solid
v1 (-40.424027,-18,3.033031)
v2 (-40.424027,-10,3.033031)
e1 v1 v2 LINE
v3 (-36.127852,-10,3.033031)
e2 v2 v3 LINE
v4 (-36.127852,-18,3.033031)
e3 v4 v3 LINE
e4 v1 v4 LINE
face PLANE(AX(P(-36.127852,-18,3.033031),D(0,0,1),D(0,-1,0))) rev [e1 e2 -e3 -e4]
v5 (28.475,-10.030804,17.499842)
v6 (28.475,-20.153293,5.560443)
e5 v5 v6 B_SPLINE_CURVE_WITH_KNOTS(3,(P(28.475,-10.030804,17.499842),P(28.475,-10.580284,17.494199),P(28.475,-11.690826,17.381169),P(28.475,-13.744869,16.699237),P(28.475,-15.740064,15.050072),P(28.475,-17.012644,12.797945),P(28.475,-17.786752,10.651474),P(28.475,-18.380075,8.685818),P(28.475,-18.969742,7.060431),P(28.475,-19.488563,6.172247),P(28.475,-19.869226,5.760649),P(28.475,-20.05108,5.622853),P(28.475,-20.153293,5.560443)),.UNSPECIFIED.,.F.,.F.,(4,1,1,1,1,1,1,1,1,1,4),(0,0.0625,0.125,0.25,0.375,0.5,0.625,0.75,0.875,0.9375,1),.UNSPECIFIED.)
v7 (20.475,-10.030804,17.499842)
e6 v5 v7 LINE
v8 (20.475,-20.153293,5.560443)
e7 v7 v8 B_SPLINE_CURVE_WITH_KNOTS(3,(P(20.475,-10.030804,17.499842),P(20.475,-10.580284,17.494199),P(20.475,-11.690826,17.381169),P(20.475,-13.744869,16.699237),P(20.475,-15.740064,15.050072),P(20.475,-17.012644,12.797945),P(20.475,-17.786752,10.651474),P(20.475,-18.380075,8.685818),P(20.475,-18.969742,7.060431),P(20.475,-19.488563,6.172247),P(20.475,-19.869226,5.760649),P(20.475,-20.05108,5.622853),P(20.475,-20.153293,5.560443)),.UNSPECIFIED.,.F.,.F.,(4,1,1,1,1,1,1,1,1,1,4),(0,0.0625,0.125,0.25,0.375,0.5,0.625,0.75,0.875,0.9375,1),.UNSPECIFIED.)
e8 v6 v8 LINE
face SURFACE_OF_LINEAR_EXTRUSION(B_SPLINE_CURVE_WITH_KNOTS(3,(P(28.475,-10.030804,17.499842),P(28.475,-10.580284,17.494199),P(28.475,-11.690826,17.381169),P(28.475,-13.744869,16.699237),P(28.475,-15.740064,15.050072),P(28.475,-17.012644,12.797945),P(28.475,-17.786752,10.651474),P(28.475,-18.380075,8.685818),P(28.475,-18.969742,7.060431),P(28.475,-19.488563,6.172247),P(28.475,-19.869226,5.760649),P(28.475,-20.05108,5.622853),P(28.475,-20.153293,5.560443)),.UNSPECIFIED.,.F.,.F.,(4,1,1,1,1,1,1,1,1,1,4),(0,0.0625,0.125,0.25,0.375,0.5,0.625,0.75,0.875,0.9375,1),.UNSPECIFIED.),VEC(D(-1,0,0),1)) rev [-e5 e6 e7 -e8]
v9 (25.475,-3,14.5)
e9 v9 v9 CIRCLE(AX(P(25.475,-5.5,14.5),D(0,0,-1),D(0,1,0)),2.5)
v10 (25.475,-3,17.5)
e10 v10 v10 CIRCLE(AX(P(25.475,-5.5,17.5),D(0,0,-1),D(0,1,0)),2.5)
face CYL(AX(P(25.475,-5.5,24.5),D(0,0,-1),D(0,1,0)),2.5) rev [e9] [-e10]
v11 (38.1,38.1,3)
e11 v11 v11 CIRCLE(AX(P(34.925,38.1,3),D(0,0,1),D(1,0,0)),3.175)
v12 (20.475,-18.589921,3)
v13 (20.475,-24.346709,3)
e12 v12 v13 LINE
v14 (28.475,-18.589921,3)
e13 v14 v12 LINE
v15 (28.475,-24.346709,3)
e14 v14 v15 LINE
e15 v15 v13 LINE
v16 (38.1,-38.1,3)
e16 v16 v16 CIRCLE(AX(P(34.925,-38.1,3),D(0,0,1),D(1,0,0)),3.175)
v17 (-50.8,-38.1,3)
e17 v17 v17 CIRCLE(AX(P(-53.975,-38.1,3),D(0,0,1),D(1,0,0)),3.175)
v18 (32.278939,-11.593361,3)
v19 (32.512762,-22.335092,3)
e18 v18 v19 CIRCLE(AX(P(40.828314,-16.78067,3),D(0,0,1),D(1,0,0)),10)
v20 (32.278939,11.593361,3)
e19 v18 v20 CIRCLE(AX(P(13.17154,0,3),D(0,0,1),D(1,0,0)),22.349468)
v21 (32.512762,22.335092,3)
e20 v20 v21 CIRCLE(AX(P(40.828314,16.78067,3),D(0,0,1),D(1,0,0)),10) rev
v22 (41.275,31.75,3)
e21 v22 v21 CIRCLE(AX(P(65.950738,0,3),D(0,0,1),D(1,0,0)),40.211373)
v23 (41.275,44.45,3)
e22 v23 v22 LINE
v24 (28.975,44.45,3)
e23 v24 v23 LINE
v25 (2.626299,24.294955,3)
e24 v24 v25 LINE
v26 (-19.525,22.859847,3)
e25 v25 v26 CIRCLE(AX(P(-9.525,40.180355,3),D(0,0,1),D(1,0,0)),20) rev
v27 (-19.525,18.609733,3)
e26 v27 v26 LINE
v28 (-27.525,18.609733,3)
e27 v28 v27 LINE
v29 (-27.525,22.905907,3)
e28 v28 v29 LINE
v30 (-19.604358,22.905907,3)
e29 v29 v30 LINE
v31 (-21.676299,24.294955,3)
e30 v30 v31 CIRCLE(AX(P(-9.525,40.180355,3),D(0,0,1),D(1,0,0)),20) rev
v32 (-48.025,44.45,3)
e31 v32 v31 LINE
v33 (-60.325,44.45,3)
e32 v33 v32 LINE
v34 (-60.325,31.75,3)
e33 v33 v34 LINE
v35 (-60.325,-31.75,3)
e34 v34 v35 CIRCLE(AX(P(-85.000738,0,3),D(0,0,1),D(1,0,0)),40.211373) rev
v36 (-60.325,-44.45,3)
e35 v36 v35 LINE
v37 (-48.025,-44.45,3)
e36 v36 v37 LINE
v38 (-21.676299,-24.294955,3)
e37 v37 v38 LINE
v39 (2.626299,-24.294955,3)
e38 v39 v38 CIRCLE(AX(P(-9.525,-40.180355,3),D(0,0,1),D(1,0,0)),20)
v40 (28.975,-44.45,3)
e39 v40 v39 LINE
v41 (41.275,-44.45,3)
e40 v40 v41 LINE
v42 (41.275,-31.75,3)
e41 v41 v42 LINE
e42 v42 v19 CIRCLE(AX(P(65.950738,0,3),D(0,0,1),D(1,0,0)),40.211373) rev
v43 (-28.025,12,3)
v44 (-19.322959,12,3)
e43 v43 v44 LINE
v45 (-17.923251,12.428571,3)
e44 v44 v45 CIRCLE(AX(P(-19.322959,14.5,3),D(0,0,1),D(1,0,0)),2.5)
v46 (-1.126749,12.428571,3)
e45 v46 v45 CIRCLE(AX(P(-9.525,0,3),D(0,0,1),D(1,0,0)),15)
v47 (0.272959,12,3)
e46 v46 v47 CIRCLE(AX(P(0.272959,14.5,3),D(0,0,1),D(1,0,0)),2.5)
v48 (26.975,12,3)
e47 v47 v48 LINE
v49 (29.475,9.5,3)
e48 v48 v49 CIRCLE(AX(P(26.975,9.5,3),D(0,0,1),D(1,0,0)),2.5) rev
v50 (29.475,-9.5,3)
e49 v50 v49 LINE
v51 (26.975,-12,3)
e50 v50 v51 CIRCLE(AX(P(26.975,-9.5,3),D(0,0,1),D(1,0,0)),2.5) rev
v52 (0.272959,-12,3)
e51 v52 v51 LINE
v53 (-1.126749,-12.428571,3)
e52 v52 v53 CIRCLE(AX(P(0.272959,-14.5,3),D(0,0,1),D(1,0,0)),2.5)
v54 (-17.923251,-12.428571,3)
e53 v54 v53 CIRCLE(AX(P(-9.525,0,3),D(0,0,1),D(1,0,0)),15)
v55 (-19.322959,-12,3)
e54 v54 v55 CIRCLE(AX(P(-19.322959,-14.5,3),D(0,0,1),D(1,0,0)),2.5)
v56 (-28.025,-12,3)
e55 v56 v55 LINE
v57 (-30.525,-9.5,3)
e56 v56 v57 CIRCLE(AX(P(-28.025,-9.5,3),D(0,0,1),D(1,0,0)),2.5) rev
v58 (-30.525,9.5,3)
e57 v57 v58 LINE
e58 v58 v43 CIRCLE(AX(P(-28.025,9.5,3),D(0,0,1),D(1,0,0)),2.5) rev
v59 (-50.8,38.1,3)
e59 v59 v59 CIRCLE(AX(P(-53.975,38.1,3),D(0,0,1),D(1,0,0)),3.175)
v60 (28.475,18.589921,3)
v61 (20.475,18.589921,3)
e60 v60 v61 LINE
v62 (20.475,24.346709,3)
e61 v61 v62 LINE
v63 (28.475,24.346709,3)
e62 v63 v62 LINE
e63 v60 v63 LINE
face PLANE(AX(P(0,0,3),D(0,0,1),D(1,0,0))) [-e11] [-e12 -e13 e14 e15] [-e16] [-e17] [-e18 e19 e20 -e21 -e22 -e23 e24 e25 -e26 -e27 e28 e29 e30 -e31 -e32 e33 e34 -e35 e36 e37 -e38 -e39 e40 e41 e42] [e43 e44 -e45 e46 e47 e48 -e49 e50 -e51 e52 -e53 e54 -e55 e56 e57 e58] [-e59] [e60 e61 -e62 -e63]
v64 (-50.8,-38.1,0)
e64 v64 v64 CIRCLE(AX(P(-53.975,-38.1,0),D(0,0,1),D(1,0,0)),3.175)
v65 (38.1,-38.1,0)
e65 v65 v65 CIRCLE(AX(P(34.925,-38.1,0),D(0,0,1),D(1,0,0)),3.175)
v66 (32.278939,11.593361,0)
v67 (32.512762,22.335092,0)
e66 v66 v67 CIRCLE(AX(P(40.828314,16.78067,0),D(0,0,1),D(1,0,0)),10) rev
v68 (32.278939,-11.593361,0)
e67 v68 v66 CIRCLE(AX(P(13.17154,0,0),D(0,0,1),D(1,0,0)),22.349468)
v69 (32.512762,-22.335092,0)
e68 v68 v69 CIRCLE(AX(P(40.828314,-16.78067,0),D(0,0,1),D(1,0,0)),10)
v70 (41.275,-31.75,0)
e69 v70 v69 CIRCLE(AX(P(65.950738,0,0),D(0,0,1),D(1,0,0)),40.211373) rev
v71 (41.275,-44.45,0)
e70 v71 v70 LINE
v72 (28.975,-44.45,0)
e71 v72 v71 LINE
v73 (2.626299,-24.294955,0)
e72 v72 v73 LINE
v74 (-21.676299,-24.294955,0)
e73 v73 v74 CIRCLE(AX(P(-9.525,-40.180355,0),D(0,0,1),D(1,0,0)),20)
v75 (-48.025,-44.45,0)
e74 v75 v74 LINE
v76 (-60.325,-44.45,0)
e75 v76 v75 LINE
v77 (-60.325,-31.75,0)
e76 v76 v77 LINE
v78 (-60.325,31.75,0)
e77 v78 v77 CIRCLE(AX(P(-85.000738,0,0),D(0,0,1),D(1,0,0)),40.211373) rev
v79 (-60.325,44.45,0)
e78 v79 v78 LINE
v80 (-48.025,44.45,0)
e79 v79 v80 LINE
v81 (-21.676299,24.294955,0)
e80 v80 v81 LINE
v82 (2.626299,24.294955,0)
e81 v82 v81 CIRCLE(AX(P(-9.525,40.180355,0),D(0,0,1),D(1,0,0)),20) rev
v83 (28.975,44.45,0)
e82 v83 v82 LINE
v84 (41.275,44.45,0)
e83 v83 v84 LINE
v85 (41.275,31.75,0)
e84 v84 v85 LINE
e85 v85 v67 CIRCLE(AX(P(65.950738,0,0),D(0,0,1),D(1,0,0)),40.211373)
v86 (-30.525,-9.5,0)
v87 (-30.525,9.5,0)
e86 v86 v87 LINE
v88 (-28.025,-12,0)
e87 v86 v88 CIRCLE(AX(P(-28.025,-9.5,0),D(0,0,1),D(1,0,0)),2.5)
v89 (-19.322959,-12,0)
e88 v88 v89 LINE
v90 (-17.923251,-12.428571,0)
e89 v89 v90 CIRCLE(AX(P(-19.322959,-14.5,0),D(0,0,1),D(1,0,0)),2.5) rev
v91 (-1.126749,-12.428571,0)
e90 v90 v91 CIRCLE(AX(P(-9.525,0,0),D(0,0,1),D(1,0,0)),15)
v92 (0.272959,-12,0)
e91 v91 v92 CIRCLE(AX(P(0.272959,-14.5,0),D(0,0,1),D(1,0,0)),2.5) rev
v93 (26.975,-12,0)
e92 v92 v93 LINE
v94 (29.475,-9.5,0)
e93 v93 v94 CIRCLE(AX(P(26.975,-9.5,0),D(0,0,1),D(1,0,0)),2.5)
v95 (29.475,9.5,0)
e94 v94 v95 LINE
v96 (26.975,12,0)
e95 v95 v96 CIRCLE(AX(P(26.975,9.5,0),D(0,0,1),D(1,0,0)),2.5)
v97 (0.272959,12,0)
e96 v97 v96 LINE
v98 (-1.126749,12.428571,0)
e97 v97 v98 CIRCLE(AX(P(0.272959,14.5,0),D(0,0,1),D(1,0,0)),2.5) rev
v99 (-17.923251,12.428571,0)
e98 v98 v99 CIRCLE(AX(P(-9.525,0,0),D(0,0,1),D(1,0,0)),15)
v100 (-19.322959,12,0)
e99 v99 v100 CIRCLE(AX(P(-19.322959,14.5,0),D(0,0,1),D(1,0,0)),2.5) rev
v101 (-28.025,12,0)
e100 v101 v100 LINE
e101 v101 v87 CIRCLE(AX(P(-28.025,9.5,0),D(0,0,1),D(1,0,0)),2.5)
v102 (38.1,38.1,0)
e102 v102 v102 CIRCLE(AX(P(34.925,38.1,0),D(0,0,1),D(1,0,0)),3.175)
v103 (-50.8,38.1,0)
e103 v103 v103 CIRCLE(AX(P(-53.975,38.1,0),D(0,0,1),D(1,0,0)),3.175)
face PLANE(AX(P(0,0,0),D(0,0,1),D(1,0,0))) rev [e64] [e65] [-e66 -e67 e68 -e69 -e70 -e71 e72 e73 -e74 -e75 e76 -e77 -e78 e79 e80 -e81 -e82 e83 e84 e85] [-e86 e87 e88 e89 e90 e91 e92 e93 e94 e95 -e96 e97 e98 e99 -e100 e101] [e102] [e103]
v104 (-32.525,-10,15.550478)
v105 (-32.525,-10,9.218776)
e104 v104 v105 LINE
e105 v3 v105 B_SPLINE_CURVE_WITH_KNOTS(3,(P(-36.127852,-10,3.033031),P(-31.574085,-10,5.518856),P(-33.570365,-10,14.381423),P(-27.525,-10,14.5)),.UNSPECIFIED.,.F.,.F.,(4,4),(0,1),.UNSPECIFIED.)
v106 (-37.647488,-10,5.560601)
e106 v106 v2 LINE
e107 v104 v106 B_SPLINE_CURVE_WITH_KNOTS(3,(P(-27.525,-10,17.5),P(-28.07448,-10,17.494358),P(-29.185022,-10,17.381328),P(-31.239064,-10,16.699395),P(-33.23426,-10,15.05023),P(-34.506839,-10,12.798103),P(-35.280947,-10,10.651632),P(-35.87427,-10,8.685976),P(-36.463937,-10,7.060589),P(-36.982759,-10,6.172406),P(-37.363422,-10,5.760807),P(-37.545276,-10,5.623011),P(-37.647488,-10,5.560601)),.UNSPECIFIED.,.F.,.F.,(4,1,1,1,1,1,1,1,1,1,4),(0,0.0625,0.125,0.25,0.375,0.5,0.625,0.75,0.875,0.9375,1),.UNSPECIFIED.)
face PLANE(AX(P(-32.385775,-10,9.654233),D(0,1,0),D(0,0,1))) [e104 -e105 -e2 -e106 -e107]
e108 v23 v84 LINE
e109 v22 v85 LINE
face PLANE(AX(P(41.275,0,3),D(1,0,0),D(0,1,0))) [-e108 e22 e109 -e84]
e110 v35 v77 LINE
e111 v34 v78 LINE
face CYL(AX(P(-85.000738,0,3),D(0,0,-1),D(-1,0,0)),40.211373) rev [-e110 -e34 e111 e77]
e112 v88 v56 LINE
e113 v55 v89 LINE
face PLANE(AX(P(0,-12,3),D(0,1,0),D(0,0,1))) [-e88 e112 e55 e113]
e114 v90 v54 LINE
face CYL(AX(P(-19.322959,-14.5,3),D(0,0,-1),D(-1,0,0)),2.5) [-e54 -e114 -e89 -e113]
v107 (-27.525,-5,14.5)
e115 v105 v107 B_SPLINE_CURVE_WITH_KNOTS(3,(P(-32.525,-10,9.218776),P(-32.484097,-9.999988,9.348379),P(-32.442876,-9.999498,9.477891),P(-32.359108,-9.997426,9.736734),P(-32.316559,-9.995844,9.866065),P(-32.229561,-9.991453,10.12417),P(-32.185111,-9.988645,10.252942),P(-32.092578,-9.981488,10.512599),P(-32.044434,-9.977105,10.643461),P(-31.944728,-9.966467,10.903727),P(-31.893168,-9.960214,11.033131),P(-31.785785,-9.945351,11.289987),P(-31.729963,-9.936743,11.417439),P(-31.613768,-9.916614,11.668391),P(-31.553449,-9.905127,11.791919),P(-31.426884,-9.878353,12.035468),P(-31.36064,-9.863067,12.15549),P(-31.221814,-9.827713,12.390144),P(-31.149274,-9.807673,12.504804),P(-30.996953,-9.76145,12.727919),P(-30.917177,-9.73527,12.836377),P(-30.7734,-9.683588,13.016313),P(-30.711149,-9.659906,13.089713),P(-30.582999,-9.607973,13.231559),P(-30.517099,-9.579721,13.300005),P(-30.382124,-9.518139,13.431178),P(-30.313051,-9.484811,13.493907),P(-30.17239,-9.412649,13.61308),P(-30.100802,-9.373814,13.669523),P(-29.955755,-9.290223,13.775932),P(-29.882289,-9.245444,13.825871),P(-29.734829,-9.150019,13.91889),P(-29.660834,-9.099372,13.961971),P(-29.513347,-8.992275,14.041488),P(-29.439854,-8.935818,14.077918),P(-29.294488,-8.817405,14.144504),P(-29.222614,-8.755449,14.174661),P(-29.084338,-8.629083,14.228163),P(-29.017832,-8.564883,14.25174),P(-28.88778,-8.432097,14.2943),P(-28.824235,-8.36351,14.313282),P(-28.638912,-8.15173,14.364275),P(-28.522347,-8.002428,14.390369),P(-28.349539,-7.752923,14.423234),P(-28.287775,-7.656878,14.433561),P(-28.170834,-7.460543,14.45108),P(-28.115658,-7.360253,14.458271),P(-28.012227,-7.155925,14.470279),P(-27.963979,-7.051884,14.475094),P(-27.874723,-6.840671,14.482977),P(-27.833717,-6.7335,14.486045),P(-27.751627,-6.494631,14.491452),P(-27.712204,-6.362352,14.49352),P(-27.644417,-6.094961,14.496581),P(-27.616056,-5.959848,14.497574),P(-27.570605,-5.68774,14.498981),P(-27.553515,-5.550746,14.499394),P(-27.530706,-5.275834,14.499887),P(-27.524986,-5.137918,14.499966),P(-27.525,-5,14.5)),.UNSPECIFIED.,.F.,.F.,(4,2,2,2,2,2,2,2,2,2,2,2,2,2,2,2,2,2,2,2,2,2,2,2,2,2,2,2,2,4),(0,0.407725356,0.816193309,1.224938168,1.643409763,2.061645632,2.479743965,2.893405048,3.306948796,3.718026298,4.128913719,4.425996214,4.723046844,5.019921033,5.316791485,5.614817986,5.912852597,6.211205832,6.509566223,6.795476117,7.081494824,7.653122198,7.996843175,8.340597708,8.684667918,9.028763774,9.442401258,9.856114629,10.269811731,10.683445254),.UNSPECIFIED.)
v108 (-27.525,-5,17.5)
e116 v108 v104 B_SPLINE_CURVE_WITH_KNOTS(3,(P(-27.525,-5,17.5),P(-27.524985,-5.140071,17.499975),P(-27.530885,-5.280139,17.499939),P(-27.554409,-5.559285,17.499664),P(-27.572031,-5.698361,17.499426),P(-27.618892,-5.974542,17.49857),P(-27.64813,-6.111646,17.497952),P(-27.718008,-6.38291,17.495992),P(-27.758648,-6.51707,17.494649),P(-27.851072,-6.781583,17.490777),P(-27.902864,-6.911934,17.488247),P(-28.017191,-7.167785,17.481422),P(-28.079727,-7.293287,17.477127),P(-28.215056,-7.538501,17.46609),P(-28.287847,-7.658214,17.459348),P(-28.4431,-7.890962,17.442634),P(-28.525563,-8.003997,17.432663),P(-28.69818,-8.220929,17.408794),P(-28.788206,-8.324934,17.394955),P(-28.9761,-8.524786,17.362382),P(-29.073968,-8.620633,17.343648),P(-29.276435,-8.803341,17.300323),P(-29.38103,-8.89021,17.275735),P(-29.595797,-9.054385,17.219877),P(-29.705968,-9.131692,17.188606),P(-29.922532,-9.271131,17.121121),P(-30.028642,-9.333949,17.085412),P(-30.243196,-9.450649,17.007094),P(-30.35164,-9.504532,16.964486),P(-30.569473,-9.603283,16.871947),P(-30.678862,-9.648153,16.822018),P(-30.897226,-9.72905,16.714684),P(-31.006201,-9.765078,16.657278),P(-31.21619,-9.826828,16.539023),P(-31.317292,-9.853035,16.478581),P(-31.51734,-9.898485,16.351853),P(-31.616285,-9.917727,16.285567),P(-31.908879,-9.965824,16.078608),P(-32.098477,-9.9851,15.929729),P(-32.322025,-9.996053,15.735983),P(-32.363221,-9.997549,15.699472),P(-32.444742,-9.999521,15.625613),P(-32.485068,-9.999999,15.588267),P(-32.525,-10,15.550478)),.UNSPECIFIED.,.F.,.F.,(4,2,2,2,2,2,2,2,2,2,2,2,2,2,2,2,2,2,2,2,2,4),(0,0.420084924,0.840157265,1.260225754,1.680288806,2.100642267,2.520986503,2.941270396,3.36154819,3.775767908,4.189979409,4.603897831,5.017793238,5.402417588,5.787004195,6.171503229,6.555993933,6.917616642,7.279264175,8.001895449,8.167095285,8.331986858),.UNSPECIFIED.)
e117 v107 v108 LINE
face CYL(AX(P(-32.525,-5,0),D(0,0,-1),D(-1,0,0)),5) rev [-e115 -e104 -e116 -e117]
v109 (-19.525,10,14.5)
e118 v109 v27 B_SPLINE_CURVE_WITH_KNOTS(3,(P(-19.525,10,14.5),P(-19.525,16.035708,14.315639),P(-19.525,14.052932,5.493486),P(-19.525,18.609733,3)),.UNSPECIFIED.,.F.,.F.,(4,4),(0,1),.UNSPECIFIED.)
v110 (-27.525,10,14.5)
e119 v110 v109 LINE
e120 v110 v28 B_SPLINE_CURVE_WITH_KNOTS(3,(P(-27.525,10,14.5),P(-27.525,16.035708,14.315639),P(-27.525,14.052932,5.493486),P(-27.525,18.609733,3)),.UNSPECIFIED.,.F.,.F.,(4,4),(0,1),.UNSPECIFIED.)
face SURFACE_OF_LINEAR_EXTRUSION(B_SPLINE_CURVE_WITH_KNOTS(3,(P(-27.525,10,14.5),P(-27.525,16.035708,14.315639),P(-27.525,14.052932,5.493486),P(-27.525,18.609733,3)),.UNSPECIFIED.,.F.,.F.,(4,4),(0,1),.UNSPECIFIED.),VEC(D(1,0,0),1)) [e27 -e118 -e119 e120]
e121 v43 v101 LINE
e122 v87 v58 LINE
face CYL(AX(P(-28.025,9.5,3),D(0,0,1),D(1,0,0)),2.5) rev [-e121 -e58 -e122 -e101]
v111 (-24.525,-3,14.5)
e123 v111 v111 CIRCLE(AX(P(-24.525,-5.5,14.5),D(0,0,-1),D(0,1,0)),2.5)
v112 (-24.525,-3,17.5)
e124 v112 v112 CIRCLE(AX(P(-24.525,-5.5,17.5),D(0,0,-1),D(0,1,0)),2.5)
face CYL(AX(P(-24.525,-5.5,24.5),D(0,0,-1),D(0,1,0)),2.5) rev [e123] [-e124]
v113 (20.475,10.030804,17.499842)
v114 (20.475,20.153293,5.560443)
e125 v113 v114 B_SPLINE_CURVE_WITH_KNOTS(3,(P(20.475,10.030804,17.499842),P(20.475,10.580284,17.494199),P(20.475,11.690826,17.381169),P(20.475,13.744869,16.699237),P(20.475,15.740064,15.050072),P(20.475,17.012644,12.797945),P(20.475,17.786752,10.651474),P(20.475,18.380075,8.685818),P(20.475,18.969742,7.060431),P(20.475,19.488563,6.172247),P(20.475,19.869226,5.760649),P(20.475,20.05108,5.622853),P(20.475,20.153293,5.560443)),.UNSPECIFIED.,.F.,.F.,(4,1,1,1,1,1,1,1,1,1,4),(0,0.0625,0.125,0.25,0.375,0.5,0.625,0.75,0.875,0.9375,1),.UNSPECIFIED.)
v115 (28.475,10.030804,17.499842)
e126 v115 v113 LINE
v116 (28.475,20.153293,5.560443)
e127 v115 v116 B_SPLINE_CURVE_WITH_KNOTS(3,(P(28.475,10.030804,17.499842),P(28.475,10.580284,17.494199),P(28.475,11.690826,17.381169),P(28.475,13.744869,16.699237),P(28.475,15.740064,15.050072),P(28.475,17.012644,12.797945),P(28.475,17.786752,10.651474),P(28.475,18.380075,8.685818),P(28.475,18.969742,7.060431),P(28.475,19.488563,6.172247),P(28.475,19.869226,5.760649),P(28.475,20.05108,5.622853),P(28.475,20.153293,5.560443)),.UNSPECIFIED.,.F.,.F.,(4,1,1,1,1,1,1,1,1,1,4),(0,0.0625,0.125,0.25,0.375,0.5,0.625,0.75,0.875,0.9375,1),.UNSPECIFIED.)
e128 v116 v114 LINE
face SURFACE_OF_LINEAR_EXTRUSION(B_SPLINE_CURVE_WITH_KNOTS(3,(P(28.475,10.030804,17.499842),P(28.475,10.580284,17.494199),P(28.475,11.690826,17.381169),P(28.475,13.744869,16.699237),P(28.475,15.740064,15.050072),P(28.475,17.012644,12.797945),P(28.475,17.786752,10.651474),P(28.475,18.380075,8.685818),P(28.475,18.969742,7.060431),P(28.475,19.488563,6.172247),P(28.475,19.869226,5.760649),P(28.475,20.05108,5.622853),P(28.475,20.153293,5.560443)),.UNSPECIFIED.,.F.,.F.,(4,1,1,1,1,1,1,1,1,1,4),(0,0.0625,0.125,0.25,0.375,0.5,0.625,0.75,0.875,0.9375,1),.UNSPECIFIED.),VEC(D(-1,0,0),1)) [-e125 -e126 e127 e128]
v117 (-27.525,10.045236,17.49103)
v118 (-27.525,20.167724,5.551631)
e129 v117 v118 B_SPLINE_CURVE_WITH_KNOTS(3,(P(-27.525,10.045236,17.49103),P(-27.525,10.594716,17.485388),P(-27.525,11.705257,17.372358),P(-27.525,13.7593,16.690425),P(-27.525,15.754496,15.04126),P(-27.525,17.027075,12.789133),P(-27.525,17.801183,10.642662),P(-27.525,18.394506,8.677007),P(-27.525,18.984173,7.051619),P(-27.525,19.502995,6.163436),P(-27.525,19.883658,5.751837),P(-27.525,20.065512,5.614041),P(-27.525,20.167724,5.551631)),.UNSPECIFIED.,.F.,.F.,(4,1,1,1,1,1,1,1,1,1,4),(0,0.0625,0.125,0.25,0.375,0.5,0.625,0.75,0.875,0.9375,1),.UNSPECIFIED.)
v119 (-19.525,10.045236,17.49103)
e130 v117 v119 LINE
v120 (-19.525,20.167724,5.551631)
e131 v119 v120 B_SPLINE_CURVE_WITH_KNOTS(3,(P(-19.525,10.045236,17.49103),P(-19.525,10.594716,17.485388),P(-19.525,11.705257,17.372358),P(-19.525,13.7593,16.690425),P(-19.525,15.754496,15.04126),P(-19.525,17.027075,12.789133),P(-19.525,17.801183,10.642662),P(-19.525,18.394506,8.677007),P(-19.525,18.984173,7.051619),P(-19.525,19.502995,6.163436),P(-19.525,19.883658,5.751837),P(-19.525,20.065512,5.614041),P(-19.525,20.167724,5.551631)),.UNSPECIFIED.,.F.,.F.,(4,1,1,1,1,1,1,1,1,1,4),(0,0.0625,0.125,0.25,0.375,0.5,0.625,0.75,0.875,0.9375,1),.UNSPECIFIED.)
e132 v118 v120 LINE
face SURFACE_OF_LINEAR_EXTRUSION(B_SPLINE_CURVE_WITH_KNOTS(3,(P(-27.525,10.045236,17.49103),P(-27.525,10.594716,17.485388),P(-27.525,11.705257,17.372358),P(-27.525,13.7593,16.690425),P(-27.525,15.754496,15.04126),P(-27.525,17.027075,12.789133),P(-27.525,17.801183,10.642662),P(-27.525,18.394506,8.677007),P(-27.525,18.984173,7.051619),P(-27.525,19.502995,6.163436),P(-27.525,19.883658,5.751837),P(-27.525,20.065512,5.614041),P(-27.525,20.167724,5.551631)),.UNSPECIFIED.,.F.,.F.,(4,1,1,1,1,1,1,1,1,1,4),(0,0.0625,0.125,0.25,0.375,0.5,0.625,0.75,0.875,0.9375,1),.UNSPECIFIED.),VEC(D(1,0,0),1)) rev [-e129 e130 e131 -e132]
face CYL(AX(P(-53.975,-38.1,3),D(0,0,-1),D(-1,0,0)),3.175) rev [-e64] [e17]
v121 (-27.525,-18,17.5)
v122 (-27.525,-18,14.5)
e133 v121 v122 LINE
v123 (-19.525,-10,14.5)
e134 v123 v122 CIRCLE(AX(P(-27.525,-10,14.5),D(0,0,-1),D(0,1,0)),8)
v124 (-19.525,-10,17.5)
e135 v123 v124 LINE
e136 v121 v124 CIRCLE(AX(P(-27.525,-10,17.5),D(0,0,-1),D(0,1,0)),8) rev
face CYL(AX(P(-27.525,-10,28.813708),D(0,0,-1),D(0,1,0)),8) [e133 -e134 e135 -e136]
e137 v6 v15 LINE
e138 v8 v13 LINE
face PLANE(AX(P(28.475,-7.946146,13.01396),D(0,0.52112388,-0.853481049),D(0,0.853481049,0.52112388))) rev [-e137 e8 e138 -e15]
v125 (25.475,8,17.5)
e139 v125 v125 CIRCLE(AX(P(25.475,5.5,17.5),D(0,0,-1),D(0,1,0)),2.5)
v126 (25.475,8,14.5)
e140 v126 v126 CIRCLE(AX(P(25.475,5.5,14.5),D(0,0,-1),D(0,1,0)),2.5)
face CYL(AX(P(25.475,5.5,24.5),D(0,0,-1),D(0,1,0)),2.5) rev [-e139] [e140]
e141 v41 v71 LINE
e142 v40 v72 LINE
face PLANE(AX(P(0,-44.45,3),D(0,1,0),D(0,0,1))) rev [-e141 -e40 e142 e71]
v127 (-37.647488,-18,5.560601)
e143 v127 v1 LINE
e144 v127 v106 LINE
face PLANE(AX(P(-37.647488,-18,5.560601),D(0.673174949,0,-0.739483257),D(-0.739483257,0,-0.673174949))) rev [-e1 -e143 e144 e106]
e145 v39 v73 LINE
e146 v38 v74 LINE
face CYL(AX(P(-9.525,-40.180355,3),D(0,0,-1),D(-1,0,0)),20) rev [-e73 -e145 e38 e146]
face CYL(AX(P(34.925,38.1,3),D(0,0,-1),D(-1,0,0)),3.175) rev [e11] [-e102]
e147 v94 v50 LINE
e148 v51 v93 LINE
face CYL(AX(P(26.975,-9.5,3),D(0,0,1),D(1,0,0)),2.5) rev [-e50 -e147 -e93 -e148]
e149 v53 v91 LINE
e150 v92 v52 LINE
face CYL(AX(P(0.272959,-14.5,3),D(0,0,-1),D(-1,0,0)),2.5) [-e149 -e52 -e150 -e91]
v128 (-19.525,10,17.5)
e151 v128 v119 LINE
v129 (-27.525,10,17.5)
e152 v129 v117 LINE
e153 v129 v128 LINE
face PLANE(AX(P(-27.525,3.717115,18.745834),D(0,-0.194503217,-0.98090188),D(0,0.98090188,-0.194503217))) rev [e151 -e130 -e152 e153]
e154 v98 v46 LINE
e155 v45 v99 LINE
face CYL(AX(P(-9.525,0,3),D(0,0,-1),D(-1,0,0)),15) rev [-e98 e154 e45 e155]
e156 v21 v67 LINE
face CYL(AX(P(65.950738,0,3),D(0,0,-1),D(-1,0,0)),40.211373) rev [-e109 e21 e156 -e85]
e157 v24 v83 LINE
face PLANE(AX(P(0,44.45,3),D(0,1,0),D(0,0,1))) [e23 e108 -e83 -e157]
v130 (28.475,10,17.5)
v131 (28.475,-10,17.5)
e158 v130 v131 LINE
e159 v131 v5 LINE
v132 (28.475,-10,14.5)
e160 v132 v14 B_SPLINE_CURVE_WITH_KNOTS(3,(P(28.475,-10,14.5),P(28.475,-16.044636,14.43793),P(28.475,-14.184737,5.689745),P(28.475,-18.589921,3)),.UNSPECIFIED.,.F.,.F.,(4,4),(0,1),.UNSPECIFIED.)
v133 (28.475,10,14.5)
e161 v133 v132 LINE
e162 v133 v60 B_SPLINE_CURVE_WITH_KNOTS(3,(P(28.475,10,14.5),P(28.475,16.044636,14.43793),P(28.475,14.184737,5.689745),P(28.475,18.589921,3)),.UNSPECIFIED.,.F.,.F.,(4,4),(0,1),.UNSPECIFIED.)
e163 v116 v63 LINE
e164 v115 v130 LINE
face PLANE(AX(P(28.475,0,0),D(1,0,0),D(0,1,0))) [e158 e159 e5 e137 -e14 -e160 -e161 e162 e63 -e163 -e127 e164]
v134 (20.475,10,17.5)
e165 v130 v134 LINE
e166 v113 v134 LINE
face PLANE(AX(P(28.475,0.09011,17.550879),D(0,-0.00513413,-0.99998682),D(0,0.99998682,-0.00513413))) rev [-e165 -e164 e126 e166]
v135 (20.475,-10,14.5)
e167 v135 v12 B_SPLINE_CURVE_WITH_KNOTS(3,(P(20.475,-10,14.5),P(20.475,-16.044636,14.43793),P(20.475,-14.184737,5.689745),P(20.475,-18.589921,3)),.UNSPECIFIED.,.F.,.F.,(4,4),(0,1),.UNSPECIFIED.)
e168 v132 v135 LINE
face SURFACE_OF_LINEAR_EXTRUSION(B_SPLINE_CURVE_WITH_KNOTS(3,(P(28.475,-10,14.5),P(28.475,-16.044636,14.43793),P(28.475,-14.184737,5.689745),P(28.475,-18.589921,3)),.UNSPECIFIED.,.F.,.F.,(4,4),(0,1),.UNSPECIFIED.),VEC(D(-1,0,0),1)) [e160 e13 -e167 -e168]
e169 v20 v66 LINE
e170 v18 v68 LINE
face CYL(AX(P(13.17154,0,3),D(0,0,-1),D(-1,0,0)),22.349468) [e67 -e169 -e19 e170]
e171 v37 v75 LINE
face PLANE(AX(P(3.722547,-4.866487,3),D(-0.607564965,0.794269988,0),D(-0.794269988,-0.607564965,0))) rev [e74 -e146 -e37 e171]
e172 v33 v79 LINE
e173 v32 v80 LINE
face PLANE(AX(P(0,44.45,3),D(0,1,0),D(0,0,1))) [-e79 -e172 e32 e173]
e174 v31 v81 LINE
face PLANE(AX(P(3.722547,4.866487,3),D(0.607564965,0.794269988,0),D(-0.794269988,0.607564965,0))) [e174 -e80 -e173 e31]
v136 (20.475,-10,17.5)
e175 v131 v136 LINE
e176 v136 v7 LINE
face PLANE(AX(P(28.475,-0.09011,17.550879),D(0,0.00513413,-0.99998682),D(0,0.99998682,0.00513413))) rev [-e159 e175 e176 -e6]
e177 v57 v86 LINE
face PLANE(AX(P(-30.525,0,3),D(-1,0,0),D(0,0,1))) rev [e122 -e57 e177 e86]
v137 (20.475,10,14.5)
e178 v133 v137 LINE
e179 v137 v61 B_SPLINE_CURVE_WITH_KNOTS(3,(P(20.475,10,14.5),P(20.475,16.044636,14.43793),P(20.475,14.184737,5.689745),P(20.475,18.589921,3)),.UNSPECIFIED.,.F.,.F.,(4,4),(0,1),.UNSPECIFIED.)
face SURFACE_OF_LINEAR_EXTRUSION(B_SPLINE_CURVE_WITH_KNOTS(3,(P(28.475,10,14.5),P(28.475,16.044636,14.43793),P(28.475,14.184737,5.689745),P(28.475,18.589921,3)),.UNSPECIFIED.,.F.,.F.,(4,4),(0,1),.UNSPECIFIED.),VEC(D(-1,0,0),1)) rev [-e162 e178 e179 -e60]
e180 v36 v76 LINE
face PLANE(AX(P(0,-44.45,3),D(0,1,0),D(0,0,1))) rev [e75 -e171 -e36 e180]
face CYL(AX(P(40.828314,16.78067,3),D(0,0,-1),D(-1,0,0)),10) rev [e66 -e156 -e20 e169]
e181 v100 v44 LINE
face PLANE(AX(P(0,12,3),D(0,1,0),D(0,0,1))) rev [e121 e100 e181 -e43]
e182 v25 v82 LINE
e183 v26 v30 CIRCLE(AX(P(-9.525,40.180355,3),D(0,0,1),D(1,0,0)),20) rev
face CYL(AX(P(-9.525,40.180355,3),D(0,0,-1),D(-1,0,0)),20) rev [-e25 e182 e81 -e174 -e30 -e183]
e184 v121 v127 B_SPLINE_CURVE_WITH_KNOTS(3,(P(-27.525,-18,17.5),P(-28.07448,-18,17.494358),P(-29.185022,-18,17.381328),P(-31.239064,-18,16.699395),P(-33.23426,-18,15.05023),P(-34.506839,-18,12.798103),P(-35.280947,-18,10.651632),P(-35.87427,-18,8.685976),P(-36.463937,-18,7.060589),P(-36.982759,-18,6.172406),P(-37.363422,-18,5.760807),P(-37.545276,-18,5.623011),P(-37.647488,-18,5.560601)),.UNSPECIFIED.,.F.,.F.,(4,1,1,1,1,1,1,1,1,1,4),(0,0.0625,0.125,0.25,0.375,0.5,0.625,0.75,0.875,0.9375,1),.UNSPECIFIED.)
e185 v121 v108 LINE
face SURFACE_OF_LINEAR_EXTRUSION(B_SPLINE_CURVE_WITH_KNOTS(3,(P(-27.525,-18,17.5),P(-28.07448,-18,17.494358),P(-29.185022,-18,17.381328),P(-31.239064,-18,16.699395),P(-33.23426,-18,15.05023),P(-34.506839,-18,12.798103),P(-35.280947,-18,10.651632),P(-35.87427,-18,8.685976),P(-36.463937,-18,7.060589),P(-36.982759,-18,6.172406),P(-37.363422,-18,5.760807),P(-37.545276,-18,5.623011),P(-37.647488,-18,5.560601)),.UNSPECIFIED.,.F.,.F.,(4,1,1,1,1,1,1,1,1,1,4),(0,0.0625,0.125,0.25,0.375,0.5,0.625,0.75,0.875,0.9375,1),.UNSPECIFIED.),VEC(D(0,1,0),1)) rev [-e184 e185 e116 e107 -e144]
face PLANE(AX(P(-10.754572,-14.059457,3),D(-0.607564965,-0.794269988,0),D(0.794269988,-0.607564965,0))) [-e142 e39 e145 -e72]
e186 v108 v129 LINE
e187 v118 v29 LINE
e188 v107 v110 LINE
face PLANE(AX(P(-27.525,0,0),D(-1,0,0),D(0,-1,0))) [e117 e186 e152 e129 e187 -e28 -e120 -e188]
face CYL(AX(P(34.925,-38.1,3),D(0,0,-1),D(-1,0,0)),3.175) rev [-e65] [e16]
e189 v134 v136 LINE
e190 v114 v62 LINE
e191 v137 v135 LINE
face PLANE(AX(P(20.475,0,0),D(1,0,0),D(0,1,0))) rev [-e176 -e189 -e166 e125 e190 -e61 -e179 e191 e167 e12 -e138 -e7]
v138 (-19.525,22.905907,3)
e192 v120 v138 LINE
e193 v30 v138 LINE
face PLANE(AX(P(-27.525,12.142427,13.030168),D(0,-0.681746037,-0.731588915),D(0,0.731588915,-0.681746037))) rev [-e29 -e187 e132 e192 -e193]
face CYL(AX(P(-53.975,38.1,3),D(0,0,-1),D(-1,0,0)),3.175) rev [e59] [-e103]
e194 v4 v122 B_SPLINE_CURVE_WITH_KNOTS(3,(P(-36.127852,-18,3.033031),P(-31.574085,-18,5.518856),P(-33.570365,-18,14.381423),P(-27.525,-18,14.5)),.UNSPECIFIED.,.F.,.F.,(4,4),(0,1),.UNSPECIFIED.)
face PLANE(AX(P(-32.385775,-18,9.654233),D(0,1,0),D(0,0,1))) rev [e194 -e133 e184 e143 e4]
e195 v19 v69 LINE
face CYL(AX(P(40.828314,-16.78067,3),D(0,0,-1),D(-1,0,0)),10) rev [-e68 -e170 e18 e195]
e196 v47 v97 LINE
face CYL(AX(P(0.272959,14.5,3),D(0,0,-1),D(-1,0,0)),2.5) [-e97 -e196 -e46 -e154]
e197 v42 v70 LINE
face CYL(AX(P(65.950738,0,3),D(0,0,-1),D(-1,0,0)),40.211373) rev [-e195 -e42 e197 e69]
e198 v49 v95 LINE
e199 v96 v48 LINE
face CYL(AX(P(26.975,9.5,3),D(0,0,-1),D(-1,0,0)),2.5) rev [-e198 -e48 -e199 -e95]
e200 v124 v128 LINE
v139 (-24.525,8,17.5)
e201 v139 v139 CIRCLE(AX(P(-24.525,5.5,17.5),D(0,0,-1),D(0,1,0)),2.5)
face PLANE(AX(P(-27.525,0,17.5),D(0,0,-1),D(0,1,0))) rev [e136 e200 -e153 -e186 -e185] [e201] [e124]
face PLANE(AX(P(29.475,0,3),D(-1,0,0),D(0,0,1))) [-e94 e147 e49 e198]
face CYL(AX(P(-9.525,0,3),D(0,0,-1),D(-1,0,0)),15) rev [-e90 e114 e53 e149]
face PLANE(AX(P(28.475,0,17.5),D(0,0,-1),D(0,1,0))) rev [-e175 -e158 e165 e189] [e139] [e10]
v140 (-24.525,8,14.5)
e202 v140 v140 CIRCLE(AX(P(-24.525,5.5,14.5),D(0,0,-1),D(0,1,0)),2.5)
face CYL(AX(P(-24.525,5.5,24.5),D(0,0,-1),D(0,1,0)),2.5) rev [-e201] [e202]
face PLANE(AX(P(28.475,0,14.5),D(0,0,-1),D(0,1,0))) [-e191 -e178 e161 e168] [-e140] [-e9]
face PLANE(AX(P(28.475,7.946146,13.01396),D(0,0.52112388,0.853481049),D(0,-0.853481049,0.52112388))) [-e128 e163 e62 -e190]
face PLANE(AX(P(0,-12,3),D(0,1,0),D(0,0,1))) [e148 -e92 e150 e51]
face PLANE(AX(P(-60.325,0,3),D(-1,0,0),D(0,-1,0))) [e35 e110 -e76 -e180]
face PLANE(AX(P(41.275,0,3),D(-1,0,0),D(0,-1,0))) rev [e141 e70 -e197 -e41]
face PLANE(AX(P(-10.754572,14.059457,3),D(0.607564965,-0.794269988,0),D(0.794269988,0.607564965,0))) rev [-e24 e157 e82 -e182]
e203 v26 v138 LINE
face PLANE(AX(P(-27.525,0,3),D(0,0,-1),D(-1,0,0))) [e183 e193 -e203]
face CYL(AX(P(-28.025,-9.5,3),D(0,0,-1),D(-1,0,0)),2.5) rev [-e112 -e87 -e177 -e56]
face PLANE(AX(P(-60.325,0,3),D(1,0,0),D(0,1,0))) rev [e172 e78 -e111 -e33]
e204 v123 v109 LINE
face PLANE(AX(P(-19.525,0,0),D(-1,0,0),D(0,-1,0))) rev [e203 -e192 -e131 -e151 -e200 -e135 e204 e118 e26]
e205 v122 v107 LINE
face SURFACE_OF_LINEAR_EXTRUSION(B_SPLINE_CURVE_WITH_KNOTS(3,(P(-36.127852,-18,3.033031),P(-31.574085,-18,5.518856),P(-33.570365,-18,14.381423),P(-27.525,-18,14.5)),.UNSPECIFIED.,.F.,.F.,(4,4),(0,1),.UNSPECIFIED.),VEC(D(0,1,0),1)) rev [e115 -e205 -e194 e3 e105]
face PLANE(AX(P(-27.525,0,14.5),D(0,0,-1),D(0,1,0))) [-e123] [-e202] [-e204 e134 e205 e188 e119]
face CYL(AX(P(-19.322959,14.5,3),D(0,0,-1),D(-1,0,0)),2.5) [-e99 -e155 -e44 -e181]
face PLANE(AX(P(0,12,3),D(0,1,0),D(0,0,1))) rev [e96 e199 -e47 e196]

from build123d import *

# Parameters (mm, degrees)
SKETCH1_R           = 3.175
BOSS_EXTRUDE1_DEPTH = 3
SKETCH2_W           = 20
SKETCH2_H           = 3
BOSS_EXTRUDE2_DEPTH = 8
SKETCH3_W           = 3
SKETCH3_H           = 10
BOSS_EXTRUDE3_DEPTH = 8
BOSS_EXTRUDE4_DEPTH = 3
BOSS_EXTRUDE5_DEPTH = 8
FILLET1_START       = 9.218775709
FILLET1_DEPTH       = 8.281224391
FILLET1_START_2     = -10
FILLET1_2_DEPTH     = 6
FILLET2_R           = 2.5
SKETCH6_R           = 2.5
CUT_EXTRUDE1_DEPTH  = 10


with BuildPart() as part:
    # Sketch1 → Boss-Extrude1 (new body)
    with BuildSketch(Plane.XY):
        with BuildLine():
            Line((-60.325, -31.75), (-60.325, -44.45))
            Line((-60.325, -44.45), (-48.025, -44.45))
            Line((-48.025, -44.45), (-21.676299295, -24.294954915))
            ThreePointArc((-21.676299295, -24.294954915), (-9.525, -20.180354672), (2.626299295, -24.294954915))
            Line((2.626299295, -24.294954915), (28.975, -44.45))
            Line((28.975, -44.45), (41.275, -44.45))
            Line((41.275, -44.45), (41.275, -31.75))
            ThreePointArc((41.275, -31.75), (36.515027492, -27.39513634), (32.512762317, -22.33509195))
            ThreePointArc((32.512762317, -22.33509195), (30.830682399, -16.998296592), (32.278938689, -11.593360767))
            ThreePointArc((32.278938689, -11.593360767), (35.521007508, 0), (32.278938689, 11.593360767))
            ThreePointArc((32.278938689, 11.593360767), (30.830682399, 16.998296592), (32.512762317, 22.33509195))
            ThreePointArc((32.512762317, 22.33509195), (36.515027492, 27.39513634), (41.275, 31.75))
            Line((41.275, 31.75), (41.275, 44.45))
            Line((41.275, 44.45), (28.975, 44.45))
            Line((28.975, 44.45), (2.626299295, 24.294954915))
            ThreePointArc((2.626299295, 24.294954915), (-9.525, 20.180354672), (-21.676299295, 24.294954915))
            Line((-21.676299295, 24.294954915), (-48.025, 44.45))
            Line((-48.025, 44.45), (-60.325, 44.45))
            Line((-60.325, 44.45), (-60.325, 31.75))
            ThreePointArc((-60.325, 31.75), (-48.881491961, 17.673557002), (-44.789364565, 0))
            ThreePointArc((-44.789364565, 0), (-48.881491961, -17.673557002), (-60.325, -31.75))
        make_face()
        with Locations((-53.975, -38.1)):
            Circle(SKETCH1_R, mode=Mode.SUBTRACT)
        with Locations((34.925, -38.1)):
            Circle(SKETCH1_R, mode=Mode.SUBTRACT)
        with Locations((-53.975, 38.1)):
            Circle(SKETCH1_R, mode=Mode.SUBTRACT)
        with BuildLine():
            Line((-18.525, -12), (-30.525, -12))
            Line((-30.525, -12), (-30.525, 12))
            Line((-30.525, 12), (-18.525, 12))
            ThreePointArc((-18.525, 12), (-9.525, 15), (-0.525, 12))
            Line((-0.525, 12), (29.475, 12))
            Line((29.475, 12), (29.475, -12))
            Line((29.475, -12), (-0.525, -12))
            ThreePointArc((-0.525, -12), (-9.525, -15), (-18.525, -12))
        make_face(mode=Mode.SUBTRACT)
        with Locations((34.925, 38.1)):
            Circle(SKETCH1_R, mode=Mode.SUBTRACT)
    extrude(amount=BOSS_EXTRUDE1_DEPTH)

    # Sketch2 → Boss-Extrude2 (add)
    with BuildSketch(Plane.YZ.offset(20.475)):
        with BuildLine():
            Line((10, 17.5), (10, 14.5))
            add(Edge.make_bspline(
                [(10, 14.5), (16.044635902, 14.437929649), (14.184736767, 5.689745318), (18.589920917, 3)],
                knots=[0, 0, 0, 0, 1, 1, 1, 1], degree=3))
            Line((18.589920917, 3), (24.346709493, 3))
            Line((24.346709493, 3), (20.153292557, 5.560443148))
            add(Edge.make_bspline(
                [(10.030804376, 17.499841844), (10.580284275, 17.494199418), (11.690825904, 17.381169352), (13.744868646, 16.699236551), (15.740064205, 15.05007217), (17.01264364, 12.797944804), (17.78675167, 10.651473672), (18.380074772, 8.685818255), (18.969741662, 7.060430969), (19.488563299, 6.172247499), (19.869226233, 5.760648886), (20.051080137, 5.622852657), (20.153292557, 5.560443148)],
                knots=[0, 0, 0, 0, 0.0625, 0.125, 0.25, 0.375, 0.5, 0.625, 0.75, 0.875, 0.9375, 1, 1, 1, 1], degree=3))
            Line((10.030804376, 17.499841844), (10, 17.5))
        make_face()
        with Locations((0, 16)):
            Rectangle(SKETCH2_W, SKETCH2_H)
        with BuildLine():
            add(Edge.make_bspline(
                [(-10, 14.5), (-16.044635902, 14.437929649), (-14.184736767, 5.689745318), (-18.589920917, 3)],
                knots=[0, 0, 0, 0, 1, 1, 1, 1], degree=3))
            Line((-10, 14.5), (-10, 17.5))
            Line((-10, 17.5), (-10.030804376, 17.499841844))
            add(Edge.make_bspline(
                [(-10.030804376, 17.499841844), (-10.580284275, 17.494199418), (-11.690825904, 17.381169352), (-13.744868646, 16.699236551), (-15.740064205, 15.05007217), (-17.01264364, 12.797944804), (-17.78675167, 10.651473672), (-18.380074772, 8.685818255), (-18.969741662, 7.060430969), (-19.488563299, 6.172247499), (-19.869226233, 5.760648886), (-20.051080137, 5.622852657), (-20.153292557, 5.560443148)],
                knots=[0, 0, 0, 0, 0.0625, 0.125, 0.25, 0.375, 0.5, 0.625, 0.75, 0.875, 0.9375, 1, 1, 1, 1], degree=3))
            Line((-20.153292557, 5.560443148), (-24.346709493, 3))
            Line((-24.346709493, 3), (-18.589920917, 3))
        make_face()
    extrude(amount=BOSS_EXTRUDE2_DEPTH)

    # Sketch3 → Boss-Extrude3 (add)
    with BuildSketch(Plane.ZY.offset(19.525)):
        with Locations((16, 5)):
            Rectangle(SKETCH3_W, SKETCH3_H)
        with Locations((16, -5)):
            Rectangle(SKETCH3_W, SKETCH3_H)
        with BuildLine():
            add(Edge.make_bspline(
                [(14.5, 10), (14.31563917, 16.035707977), (5.493486467, 14.05293238), (3, 18.609732698)],
                knots=[0, 0, 0, 0, 1, 1, 1, 1], degree=3))
            Line((14.5, 10), (17.5, 10))
            Line((17.5, 10), (17.491030171, 10.04523587))
            add(Edge.make_bspline(
                [(17.491030171, 10.04523587), (17.485387745, 10.594715769), (17.372357679, 11.705257398), (16.690424877, 13.75930014), (15.041260496, 15.754495699), (12.789133131, 17.027075134), (10.642661999, 17.801183164), (8.677006582, 18.394506266), (7.051619296, 18.984173156), (6.163435825, 19.502994793), (5.751837213, 19.883657727), (5.614040983, 20.065511631), (5.551631475, 20.167724051)],
                knots=[0, 0, 0, 0, 0.0625, 0.125, 0.25, 0.375, 0.5, 0.625, 0.75, 0.875, 0.9375, 1, 1, 1, 1], degree=3))
            Line((5.551631475, 20.167724051), (3, 22.905906895))
            Line((3, 22.905906895), (3, 18.609732698))
        make_face()
    extrude(amount=BOSS_EXTRUDE3_DEPTH)

    # Sketch4 → Boss-Extrude4 (add)
    with BuildSketch(Plane(origin=(0, 0, 14.5), x_dir=(-1, 0, 0), z_dir=(0, 0, -1))):
        with BuildLine():
            Line((27.525, -18), (27.525, -10))
            Line((27.525, -10), (19.525, -10))
            ThreePointArc((19.525, -10), (21.868145751, -15.656854249), (27.525, -18))
        make_face()
    extrude(amount=-BOSS_EXTRUDE4_DEPTH)

    # Sketch5 → Boss-Extrude5 (add)
    with BuildSketch(Plane.XZ.offset(10)):
        with BuildLine():
            Line((-37.647488181, 5.560601304), (-40.424026667, 3.033030687))
            Line((-40.424026667, 3.033030687), (-36.12785247, 3.033030687))
            add(Edge.make_bspline(
                [(-27.525, 14.5), (-33.57036544, 14.381422519), (-31.574084791, 5.518855921), (-36.12785247, 3.033030687)],
                knots=[0, 0, 0, 0, 1, 1, 1, 1], degree=3))
            Line((-27.525, 14.5), (-27.525, 17.5))
            add(Edge.make_bspline(
                [(-27.525, 17.5), (-28.074479899, 17.494357574), (-29.185021529, 17.381327508), (-31.23906427, 16.699394706), (-33.234259829, 15.050230325), (-34.506839264, 12.79810296), (-35.280947294, 10.651631828), (-35.874270396, 8.685976411), (-36.463937286, 7.060589125), (-36.982758923, 6.172405654), (-37.363421857, 5.760807042), (-37.545275761, 5.623010812), (-37.647488181, 5.560601304)],
                knots=[0, 0, 0, 0, 0.0625, 0.125, 0.25, 0.375, 0.5, 0.625, 0.75, 0.875, 0.9375, 1, 1, 1, 1], degree=3))
        make_face()
    extrude(amount=BOSS_EXTRUDE5_DEPTH)

    # Fillet1: read off the stored shape, not the designer's step
    # Fillet1 outline → Fillet1 (add)
    with BuildSketch(Plane.XY.offset(FILLET1_START)):
        with BuildLine():
            Line((-27.525, -10), (-27.525, -5))
            ThreePointArc((-27.525, -5), (-28.989466094, -8.535533906), (-32.525, -10))
            Line((-32.525, -10), (-27.525, -10))
        make_face()
    extrude(amount=FILLET1_DEPTH)

    # Fillet1 2 outline → Fillet1 2 (cut)
    with BuildSketch(Plane(origin=(0, 0, 0), x_dir=(1, 0, 0), z_dir=(0, 1, 0)).offset(FILLET1_START_2)):
        with BuildLine():
            Line((-32.525, -17.5000001), (-27.525, -17.5))
            add(Edge.make_bspline(
                [(-27.525, -17.5), (-28.074479899, -17.494357574), (-29.185021529, -17.381327508), (-30.968007207, -16.789384412), (-32.004283714, -16.043301537), (-32.525, -15.550477548)],
                knots=[0, 0, 0, 0, 0.0625, 0.125, 0.217009321, 0.217009321, 0.217009321, 0.217009321], degree=3))
            Line((-32.525, -15.550477548), (-32.525, -17.5000001))
        make_face()
        with BuildLine():
            Line((-27.525, -9.218775709), (-32.525000028, -9.218775718))
            add(Edge.make_bspline(
                [(-32.525000028, -9.218775718), (-31.668443392, -11.933356908), (-30.719340028, -14.437344269), (-27.525, -14.5)],
                knots=[0.47160514, 0.47160514, 0.47160514, 0.47160514, 1, 1, 1, 1], degree=3))
            Line((-27.525, -14.5), (-27.525, -9.218775709))
        make_face()
    extrude(amount=FILLET1_2_DEPTH, mode=Mode.SUBTRACT)

    # Fillet2
    fillet2_edges = [part.edges().sort_by_distance(p)[0] for p in [
        (-18.525, 12, 1.5),
        (-30.525, 12, 1.5),
        (-30.525, -12, 1.5),
        (-18.525, -12, 1.5),
        (-0.525, -12, 1.5),
        (29.475, -12, 1.5),
        (29.475, 12, 1.5),
        (-0.525, 12, 1.5),
    ]]
    fillet(fillet2_edges, radius=FILLET2_R)

    # Sketch6 → Cut-Extrude1 (cut)
    with BuildSketch(Plane(origin=(0, 0, 14.5), x_dir=(-1, 0, 0), z_dir=(0, 0, -1))):
        with Locations(Location((24.525, -5.5, 0), (0, 0, 90))):
            Circle(SKETCH6_R)
        with Locations(Location((24.525, 5.5, 0), (0, 0, 90))):
            Circle(SKETCH6_R)
        with Locations(Location((-25.475, -5.5, 0), (0, 0, 90))):
            Circle(SKETCH6_R)
        with Locations(Location((-25.475, 5.5, 0), (0, 0, 90))):
            Circle(SKETCH6_R)
    extrude(amount=-CUT_EXTRUDE1_DEPTH, mode=Mode.SUBTRACT)


solid = part.part
